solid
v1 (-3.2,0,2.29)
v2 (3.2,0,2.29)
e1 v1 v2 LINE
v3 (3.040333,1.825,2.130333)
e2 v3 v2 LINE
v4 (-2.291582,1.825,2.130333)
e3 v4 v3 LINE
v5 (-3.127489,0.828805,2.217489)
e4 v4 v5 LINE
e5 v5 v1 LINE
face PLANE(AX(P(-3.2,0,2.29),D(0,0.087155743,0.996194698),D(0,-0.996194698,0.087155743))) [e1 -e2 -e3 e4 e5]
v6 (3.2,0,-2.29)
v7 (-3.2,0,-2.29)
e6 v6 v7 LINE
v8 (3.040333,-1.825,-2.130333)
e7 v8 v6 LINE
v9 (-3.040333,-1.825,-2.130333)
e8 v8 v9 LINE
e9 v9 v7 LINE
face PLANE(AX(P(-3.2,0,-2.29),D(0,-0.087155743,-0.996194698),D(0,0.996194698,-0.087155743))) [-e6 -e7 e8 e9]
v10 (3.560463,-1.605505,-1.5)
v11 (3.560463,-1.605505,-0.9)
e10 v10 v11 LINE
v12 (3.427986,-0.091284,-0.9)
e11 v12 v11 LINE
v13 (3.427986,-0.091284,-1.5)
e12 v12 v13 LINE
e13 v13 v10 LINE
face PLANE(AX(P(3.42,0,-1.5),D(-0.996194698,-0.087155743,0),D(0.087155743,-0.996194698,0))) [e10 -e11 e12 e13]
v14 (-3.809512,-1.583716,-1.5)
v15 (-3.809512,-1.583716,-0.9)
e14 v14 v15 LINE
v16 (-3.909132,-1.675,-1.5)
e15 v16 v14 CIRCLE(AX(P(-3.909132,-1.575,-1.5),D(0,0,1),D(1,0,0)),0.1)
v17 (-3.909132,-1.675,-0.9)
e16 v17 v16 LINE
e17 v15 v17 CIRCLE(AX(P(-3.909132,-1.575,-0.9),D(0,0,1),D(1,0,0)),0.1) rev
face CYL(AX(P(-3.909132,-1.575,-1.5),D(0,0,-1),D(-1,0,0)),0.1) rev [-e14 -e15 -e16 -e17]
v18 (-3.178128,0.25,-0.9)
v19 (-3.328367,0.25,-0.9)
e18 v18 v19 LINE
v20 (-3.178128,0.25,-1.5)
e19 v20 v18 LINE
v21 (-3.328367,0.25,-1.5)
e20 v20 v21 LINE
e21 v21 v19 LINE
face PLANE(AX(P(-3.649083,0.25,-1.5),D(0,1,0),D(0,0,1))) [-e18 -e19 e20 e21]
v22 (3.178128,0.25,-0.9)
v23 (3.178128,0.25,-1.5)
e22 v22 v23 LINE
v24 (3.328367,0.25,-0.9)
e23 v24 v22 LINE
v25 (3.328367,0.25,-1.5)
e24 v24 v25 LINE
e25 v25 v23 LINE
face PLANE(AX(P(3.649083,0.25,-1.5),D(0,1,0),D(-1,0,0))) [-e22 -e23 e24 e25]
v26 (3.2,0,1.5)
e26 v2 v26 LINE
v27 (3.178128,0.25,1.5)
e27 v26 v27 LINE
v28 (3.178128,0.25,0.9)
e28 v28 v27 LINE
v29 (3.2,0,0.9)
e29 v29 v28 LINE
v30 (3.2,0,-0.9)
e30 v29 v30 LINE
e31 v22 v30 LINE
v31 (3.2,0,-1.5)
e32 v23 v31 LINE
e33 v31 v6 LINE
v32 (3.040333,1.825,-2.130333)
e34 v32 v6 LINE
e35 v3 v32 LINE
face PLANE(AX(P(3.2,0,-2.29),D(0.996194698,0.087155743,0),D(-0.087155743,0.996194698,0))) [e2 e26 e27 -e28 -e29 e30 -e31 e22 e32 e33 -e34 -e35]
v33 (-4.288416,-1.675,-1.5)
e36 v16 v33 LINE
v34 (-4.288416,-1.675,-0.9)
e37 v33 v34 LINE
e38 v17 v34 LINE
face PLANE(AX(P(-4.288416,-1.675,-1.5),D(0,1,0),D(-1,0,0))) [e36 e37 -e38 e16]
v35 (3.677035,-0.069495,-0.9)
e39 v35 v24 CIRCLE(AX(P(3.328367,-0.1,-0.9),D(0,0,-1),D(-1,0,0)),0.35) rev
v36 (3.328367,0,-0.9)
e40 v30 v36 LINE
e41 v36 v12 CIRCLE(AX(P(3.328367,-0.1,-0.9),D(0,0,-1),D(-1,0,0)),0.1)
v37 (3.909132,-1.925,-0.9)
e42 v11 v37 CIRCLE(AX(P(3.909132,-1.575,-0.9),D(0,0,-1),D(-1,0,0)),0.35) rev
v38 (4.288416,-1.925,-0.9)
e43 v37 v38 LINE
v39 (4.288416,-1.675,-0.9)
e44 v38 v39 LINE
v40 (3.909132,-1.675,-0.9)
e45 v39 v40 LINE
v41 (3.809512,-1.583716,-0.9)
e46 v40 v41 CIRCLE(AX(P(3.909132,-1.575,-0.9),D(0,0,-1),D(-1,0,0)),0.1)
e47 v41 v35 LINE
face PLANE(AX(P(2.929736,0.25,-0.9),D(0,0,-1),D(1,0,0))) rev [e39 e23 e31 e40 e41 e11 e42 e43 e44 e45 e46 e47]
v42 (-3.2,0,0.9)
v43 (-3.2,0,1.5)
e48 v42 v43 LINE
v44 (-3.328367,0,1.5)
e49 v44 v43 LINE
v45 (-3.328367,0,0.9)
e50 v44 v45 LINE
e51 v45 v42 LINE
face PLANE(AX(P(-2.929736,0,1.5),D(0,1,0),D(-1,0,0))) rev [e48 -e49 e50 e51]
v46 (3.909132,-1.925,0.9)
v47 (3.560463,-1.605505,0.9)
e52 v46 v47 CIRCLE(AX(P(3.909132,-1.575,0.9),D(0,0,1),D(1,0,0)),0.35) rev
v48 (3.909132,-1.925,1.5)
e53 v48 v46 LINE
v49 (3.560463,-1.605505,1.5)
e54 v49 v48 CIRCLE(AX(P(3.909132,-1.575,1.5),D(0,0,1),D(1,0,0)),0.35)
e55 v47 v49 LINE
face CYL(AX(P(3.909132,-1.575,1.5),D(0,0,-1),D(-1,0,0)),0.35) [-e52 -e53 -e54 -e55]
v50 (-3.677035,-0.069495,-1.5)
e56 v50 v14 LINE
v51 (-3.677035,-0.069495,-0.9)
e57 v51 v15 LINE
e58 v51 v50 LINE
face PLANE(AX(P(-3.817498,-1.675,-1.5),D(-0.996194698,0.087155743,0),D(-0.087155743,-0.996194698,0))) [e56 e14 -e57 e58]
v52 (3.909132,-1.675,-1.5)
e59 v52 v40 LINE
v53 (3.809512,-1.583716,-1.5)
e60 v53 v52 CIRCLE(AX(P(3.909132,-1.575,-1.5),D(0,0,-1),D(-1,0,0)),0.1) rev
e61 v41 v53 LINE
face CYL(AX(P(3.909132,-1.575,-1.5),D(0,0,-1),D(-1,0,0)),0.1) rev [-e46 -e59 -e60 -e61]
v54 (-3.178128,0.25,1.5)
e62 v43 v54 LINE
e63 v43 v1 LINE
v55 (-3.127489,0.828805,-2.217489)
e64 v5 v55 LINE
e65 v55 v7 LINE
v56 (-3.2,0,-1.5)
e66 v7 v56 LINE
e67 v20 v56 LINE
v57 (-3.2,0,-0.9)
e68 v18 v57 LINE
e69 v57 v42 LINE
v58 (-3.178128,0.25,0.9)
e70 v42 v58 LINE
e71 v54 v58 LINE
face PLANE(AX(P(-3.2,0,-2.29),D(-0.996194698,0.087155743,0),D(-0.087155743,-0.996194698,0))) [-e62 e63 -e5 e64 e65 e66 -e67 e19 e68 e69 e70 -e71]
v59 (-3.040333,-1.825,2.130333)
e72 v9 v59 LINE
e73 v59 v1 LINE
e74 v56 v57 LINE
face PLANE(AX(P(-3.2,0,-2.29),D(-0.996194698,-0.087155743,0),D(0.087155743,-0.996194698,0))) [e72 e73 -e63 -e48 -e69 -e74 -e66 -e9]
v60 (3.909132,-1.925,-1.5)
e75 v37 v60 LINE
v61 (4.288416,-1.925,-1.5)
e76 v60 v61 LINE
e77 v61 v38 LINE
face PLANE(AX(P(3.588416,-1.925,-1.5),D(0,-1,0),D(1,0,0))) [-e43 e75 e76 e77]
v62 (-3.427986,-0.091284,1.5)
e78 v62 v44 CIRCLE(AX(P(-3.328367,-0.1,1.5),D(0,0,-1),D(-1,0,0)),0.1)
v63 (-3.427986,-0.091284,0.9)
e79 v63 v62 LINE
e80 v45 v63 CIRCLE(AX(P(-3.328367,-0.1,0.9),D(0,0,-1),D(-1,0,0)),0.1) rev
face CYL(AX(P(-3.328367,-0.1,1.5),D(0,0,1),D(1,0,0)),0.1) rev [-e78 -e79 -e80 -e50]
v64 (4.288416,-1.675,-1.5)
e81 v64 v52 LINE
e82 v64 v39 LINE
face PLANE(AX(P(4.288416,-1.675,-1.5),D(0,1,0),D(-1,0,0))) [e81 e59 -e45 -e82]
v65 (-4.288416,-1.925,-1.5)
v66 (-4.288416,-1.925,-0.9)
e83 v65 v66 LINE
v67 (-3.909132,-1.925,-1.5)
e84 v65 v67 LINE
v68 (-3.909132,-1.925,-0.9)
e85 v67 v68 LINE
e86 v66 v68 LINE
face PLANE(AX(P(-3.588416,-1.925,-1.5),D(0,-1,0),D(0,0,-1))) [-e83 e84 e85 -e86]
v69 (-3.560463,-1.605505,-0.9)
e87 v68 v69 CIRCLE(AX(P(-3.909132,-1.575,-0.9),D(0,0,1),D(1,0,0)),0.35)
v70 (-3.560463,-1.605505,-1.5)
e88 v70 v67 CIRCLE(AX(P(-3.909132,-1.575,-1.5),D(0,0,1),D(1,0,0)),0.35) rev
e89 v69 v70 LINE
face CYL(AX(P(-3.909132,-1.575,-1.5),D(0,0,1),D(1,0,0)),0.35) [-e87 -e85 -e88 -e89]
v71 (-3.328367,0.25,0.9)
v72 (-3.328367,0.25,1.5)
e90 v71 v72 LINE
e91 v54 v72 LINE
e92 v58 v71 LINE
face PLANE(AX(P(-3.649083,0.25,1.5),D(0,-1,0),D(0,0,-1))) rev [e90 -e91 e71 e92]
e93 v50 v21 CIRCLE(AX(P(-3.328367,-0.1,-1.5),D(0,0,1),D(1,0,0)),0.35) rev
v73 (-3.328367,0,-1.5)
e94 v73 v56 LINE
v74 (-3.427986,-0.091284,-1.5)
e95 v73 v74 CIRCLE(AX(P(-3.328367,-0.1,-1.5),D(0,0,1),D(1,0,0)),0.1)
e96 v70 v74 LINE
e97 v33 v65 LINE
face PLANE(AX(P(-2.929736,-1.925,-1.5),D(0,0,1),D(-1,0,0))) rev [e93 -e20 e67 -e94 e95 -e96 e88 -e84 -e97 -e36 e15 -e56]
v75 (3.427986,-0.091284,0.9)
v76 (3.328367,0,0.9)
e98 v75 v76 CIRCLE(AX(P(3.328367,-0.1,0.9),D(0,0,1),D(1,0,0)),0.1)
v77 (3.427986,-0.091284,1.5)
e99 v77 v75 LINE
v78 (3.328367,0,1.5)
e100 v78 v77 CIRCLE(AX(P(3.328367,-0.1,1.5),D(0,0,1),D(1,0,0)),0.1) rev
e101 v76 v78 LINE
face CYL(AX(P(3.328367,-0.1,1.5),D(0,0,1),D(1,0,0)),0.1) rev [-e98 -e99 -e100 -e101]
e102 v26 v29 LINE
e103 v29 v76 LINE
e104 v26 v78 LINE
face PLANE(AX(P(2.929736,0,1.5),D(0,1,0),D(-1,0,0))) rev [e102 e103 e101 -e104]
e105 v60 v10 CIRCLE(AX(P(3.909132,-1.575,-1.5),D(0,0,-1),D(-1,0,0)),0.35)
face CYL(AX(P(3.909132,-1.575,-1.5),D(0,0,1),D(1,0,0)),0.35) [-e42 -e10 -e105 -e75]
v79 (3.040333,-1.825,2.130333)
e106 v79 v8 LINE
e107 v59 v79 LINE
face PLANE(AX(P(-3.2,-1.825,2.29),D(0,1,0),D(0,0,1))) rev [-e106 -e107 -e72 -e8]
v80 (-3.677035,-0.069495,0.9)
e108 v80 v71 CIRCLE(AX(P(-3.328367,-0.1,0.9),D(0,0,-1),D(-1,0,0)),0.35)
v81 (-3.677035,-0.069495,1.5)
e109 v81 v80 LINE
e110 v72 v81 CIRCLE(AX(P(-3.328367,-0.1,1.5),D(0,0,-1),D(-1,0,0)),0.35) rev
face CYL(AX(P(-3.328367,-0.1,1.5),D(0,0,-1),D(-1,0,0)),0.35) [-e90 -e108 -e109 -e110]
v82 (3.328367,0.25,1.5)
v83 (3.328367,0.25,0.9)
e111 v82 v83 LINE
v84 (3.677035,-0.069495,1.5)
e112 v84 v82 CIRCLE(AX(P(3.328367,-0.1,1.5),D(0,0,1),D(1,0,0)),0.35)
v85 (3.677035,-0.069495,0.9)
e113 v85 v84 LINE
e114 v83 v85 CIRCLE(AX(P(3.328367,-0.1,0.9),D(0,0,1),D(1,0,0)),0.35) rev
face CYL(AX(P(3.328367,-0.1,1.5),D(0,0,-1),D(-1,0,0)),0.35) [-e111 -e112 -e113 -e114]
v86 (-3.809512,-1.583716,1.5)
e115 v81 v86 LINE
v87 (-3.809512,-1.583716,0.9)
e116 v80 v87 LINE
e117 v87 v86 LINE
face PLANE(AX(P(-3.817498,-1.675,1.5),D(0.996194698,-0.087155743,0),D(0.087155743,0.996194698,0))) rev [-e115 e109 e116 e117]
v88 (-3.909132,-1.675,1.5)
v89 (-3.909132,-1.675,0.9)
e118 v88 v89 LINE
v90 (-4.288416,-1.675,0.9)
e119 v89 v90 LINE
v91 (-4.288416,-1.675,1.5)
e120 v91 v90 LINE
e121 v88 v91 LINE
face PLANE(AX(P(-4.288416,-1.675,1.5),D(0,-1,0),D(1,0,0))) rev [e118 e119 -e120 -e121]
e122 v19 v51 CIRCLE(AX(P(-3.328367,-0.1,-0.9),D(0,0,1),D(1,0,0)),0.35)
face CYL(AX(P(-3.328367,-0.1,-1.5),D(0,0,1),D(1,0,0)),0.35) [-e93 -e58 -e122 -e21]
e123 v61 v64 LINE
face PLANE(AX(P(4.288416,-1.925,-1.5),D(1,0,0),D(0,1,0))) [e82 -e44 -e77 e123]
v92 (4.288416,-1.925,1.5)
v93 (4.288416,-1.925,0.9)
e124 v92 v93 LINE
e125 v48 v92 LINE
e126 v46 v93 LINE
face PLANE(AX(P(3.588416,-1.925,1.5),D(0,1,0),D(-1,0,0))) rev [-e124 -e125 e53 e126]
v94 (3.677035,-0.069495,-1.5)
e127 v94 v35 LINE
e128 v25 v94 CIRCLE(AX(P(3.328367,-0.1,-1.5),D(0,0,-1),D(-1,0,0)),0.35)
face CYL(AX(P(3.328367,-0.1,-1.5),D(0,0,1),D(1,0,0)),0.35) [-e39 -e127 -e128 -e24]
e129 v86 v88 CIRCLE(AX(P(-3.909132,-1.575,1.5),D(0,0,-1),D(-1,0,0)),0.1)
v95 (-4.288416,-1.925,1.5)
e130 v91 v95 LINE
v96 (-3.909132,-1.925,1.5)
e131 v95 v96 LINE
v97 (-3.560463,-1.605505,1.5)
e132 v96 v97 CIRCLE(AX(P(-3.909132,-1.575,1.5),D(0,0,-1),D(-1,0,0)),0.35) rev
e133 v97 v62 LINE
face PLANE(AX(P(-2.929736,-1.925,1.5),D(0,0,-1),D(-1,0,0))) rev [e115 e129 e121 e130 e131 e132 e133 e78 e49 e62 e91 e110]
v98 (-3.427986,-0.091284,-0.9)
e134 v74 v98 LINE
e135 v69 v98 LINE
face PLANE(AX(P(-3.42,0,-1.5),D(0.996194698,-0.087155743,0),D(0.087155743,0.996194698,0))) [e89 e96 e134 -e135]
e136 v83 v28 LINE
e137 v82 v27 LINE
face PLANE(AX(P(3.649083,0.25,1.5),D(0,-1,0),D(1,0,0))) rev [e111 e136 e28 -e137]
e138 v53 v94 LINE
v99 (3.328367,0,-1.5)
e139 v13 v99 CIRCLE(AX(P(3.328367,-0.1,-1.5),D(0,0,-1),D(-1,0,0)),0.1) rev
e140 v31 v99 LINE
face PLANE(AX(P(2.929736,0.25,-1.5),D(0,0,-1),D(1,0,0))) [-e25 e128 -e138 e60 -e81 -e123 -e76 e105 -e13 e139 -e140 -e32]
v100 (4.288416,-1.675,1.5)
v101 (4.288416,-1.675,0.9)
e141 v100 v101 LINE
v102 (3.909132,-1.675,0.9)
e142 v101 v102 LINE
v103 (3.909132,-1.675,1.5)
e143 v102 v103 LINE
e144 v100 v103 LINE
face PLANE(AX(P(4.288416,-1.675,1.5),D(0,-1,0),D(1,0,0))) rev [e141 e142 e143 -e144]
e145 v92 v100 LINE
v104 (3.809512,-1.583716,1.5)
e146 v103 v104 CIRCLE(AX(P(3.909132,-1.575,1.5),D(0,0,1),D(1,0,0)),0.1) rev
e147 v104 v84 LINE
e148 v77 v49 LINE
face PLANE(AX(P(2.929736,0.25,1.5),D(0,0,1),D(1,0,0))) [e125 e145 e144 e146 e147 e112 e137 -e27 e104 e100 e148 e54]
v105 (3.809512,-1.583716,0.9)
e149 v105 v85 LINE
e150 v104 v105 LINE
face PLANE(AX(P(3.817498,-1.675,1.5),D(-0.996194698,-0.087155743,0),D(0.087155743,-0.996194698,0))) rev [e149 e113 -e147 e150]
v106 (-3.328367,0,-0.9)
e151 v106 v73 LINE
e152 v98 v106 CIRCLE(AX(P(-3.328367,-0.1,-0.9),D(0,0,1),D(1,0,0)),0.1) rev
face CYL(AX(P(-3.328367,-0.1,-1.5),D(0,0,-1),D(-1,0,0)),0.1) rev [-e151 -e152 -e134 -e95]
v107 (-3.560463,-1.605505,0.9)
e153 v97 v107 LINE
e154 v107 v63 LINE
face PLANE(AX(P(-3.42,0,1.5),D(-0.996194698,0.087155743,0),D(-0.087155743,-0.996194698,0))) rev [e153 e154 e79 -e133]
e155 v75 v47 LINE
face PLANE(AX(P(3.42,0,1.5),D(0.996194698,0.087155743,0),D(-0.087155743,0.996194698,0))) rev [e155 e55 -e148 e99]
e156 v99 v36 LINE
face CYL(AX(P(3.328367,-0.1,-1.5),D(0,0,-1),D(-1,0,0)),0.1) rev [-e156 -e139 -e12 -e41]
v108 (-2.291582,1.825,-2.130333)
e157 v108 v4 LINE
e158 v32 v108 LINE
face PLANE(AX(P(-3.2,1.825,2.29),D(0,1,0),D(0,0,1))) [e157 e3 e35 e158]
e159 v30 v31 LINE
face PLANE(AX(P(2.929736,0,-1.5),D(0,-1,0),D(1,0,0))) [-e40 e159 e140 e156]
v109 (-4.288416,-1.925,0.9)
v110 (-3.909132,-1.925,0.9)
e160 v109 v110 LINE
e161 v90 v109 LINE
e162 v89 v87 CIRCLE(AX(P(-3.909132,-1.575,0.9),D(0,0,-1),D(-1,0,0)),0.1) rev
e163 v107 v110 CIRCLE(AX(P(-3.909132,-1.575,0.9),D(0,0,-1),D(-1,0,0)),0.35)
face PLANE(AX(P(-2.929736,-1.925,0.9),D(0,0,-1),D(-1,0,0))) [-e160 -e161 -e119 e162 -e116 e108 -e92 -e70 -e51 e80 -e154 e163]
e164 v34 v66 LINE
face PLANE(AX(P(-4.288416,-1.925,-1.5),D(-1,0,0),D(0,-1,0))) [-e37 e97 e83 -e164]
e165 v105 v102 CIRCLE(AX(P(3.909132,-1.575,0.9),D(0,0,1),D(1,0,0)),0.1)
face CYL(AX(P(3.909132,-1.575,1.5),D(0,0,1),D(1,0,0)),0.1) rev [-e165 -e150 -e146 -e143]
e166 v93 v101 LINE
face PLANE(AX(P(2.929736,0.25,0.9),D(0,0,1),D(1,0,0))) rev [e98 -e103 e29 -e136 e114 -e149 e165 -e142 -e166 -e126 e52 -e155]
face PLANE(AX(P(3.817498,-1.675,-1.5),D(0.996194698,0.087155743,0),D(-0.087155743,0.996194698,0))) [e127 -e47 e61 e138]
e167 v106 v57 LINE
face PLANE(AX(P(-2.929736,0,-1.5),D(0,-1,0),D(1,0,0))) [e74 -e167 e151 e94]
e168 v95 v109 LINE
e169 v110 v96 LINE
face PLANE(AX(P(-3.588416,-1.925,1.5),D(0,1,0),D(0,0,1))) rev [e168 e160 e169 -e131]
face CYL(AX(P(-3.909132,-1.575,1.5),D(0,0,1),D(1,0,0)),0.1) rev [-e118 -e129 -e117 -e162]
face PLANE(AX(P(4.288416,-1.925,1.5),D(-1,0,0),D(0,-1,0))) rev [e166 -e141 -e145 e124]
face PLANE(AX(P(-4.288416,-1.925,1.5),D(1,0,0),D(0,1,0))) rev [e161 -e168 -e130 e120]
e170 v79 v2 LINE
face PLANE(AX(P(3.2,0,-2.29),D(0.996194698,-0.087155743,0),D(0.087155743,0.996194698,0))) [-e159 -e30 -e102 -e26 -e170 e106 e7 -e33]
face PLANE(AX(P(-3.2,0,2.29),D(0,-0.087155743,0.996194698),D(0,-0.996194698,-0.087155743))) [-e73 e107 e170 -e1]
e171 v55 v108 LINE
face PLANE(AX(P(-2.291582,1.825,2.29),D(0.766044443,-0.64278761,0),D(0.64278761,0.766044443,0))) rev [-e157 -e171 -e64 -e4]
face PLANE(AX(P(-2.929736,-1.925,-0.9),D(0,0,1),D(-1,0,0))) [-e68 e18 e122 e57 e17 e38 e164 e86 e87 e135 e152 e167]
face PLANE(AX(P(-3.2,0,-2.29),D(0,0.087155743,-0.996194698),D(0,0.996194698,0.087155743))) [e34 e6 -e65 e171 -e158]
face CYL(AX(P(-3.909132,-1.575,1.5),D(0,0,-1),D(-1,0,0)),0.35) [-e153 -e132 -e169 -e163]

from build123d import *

# Parameters (mm, degrees)
SKETCH1_W                = 6.4
SKETCH1_H                = 4.58
EXTRUDE1_DEPTH           = 1.825
EXTRUDE1_TAPER           = 5
EXTRUDE1_OTHER_WAY_DEPTH = 1.825
EXTRUDE1_OTHER_WAY_TAPER = 5
CHAMFER1_SIZE            = 1
CHAMFER1_SIZE_2          = 0.748750861
EXTRUDE2_START           = 1.2
EXTRUDE2_DEPTH           = 0.3
FILLET1_R                = 0.1
FILLET2_R                = 0.35


with BuildPart() as part:
    # Sketch1 → Extrude1 (new body)
    with BuildSketch(Plane(origin=(0, 0, 0), x_dir=(1, 0, 0), z_dir=(0, 1, 0))):
        Rectangle(SKETCH1_W, SKETCH1_H)
    extrude(amount=EXTRUDE1_DEPTH, taper=EXTRUDE1_TAPER)

    # Sketch1 → Extrude1 other way (add)
    with BuildSketch(Plane(origin=(0, 0, 0), x_dir=(1, 0, 0), z_dir=(0, 1, 0))):
        Rectangle(SKETCH1_W, SKETCH1_H)
    extrude(amount=-EXTRUDE1_OTHER_WAY_DEPTH, taper=EXTRUDE1_OTHER_WAY_TAPER)

    # Chamfer1
    # the kernel refuses this chamfer: 1, 0.748750861 mm, written as the material it takes off along each edge
    with BuildSketch(Plane(origin=(-3.040333189, 1.825, -4.712885419), x_dir=(-0.10925940413866445, -0.9940132708406181, 0), z_dir=(0, 0, 1))) as chamfer1_piece_1:
        Polygon((CHAMFER1_SIZE * 0.999753334764, CHAMFER1_SIZE * 0.0222096741985), (-CHAMFER1_SIZE_2 * 0.109259404139, CHAMFER1_SIZE_2 * 0.994013270843), (0, 0), align=None)
    extrude(amount=9.425770839, mode=Mode.SUBTRACT)

    # Sketch2 → Extrude2 (add, symmetric)
    with BuildSketch(Plane.XY.offset(EXTRUDE2_START)):
        Polygon((-2.92973568, 0), (-3.42, 0), (-3.588415677, -1.925), (-4.288415677, -1.925), (-4.288415677, -1.675), (-3.817498471, -1.675), (-3.649082794, 0.25), (-2.92973568, 0.25), align=None)
        Polygon((2.92973568, 0.25), (2.92973568, 0), (3.42, 0), (3.588415677, -1.925), (4.288415677, -1.925), (4.288415677, -1.675), (3.817498471, -1.675), (3.649082794, 0.25), align=None)
    extrude2 = extrude(amount=EXTRUDE2_DEPTH, both=True)

    # Mirror1: Extrude2 across plane
    add(extrude2.mirror(Plane.XY))

    # Fillet1
    fillet1_edges = [part.edges().sort_by_distance(p)[0] for p in [
        (3.817498471, -1.675, -1.2),
        (3.42, 0, -1.2),
        (-3.817498471, -1.675, 1.2),
        (-3.42, 0, 1.2),
        (3.42, 0, 1.2),
        (3.817498471, -1.675, 1.2),
        (-3.42, 0, -1.2),
        (-3.817498471, -1.675, -1.2),
    ]]
    fillet(fillet1_edges, radius=FILLET1_R)

    # Fillet2
    fillet2_edges = [part.edges().sort_by_distance(p)[0] for p in [
        (3.649082794, 0.25, -1.2),
        (3.588415677, -1.925, -1.2),
        (-3.649082794, 0.25, 1.2),
        (-3.588415677, -1.925, 1.2),
        (3.649082794, 0.25, 1.2),
        (3.588415677, -1.925, 1.2),
        (-3.649082794, 0.25, -1.2),
        (-3.588415677, -1.925, -1.2),
    ]]
    fillet(fillet2_edges, radius=FILLET2_R)


solid = part.part
